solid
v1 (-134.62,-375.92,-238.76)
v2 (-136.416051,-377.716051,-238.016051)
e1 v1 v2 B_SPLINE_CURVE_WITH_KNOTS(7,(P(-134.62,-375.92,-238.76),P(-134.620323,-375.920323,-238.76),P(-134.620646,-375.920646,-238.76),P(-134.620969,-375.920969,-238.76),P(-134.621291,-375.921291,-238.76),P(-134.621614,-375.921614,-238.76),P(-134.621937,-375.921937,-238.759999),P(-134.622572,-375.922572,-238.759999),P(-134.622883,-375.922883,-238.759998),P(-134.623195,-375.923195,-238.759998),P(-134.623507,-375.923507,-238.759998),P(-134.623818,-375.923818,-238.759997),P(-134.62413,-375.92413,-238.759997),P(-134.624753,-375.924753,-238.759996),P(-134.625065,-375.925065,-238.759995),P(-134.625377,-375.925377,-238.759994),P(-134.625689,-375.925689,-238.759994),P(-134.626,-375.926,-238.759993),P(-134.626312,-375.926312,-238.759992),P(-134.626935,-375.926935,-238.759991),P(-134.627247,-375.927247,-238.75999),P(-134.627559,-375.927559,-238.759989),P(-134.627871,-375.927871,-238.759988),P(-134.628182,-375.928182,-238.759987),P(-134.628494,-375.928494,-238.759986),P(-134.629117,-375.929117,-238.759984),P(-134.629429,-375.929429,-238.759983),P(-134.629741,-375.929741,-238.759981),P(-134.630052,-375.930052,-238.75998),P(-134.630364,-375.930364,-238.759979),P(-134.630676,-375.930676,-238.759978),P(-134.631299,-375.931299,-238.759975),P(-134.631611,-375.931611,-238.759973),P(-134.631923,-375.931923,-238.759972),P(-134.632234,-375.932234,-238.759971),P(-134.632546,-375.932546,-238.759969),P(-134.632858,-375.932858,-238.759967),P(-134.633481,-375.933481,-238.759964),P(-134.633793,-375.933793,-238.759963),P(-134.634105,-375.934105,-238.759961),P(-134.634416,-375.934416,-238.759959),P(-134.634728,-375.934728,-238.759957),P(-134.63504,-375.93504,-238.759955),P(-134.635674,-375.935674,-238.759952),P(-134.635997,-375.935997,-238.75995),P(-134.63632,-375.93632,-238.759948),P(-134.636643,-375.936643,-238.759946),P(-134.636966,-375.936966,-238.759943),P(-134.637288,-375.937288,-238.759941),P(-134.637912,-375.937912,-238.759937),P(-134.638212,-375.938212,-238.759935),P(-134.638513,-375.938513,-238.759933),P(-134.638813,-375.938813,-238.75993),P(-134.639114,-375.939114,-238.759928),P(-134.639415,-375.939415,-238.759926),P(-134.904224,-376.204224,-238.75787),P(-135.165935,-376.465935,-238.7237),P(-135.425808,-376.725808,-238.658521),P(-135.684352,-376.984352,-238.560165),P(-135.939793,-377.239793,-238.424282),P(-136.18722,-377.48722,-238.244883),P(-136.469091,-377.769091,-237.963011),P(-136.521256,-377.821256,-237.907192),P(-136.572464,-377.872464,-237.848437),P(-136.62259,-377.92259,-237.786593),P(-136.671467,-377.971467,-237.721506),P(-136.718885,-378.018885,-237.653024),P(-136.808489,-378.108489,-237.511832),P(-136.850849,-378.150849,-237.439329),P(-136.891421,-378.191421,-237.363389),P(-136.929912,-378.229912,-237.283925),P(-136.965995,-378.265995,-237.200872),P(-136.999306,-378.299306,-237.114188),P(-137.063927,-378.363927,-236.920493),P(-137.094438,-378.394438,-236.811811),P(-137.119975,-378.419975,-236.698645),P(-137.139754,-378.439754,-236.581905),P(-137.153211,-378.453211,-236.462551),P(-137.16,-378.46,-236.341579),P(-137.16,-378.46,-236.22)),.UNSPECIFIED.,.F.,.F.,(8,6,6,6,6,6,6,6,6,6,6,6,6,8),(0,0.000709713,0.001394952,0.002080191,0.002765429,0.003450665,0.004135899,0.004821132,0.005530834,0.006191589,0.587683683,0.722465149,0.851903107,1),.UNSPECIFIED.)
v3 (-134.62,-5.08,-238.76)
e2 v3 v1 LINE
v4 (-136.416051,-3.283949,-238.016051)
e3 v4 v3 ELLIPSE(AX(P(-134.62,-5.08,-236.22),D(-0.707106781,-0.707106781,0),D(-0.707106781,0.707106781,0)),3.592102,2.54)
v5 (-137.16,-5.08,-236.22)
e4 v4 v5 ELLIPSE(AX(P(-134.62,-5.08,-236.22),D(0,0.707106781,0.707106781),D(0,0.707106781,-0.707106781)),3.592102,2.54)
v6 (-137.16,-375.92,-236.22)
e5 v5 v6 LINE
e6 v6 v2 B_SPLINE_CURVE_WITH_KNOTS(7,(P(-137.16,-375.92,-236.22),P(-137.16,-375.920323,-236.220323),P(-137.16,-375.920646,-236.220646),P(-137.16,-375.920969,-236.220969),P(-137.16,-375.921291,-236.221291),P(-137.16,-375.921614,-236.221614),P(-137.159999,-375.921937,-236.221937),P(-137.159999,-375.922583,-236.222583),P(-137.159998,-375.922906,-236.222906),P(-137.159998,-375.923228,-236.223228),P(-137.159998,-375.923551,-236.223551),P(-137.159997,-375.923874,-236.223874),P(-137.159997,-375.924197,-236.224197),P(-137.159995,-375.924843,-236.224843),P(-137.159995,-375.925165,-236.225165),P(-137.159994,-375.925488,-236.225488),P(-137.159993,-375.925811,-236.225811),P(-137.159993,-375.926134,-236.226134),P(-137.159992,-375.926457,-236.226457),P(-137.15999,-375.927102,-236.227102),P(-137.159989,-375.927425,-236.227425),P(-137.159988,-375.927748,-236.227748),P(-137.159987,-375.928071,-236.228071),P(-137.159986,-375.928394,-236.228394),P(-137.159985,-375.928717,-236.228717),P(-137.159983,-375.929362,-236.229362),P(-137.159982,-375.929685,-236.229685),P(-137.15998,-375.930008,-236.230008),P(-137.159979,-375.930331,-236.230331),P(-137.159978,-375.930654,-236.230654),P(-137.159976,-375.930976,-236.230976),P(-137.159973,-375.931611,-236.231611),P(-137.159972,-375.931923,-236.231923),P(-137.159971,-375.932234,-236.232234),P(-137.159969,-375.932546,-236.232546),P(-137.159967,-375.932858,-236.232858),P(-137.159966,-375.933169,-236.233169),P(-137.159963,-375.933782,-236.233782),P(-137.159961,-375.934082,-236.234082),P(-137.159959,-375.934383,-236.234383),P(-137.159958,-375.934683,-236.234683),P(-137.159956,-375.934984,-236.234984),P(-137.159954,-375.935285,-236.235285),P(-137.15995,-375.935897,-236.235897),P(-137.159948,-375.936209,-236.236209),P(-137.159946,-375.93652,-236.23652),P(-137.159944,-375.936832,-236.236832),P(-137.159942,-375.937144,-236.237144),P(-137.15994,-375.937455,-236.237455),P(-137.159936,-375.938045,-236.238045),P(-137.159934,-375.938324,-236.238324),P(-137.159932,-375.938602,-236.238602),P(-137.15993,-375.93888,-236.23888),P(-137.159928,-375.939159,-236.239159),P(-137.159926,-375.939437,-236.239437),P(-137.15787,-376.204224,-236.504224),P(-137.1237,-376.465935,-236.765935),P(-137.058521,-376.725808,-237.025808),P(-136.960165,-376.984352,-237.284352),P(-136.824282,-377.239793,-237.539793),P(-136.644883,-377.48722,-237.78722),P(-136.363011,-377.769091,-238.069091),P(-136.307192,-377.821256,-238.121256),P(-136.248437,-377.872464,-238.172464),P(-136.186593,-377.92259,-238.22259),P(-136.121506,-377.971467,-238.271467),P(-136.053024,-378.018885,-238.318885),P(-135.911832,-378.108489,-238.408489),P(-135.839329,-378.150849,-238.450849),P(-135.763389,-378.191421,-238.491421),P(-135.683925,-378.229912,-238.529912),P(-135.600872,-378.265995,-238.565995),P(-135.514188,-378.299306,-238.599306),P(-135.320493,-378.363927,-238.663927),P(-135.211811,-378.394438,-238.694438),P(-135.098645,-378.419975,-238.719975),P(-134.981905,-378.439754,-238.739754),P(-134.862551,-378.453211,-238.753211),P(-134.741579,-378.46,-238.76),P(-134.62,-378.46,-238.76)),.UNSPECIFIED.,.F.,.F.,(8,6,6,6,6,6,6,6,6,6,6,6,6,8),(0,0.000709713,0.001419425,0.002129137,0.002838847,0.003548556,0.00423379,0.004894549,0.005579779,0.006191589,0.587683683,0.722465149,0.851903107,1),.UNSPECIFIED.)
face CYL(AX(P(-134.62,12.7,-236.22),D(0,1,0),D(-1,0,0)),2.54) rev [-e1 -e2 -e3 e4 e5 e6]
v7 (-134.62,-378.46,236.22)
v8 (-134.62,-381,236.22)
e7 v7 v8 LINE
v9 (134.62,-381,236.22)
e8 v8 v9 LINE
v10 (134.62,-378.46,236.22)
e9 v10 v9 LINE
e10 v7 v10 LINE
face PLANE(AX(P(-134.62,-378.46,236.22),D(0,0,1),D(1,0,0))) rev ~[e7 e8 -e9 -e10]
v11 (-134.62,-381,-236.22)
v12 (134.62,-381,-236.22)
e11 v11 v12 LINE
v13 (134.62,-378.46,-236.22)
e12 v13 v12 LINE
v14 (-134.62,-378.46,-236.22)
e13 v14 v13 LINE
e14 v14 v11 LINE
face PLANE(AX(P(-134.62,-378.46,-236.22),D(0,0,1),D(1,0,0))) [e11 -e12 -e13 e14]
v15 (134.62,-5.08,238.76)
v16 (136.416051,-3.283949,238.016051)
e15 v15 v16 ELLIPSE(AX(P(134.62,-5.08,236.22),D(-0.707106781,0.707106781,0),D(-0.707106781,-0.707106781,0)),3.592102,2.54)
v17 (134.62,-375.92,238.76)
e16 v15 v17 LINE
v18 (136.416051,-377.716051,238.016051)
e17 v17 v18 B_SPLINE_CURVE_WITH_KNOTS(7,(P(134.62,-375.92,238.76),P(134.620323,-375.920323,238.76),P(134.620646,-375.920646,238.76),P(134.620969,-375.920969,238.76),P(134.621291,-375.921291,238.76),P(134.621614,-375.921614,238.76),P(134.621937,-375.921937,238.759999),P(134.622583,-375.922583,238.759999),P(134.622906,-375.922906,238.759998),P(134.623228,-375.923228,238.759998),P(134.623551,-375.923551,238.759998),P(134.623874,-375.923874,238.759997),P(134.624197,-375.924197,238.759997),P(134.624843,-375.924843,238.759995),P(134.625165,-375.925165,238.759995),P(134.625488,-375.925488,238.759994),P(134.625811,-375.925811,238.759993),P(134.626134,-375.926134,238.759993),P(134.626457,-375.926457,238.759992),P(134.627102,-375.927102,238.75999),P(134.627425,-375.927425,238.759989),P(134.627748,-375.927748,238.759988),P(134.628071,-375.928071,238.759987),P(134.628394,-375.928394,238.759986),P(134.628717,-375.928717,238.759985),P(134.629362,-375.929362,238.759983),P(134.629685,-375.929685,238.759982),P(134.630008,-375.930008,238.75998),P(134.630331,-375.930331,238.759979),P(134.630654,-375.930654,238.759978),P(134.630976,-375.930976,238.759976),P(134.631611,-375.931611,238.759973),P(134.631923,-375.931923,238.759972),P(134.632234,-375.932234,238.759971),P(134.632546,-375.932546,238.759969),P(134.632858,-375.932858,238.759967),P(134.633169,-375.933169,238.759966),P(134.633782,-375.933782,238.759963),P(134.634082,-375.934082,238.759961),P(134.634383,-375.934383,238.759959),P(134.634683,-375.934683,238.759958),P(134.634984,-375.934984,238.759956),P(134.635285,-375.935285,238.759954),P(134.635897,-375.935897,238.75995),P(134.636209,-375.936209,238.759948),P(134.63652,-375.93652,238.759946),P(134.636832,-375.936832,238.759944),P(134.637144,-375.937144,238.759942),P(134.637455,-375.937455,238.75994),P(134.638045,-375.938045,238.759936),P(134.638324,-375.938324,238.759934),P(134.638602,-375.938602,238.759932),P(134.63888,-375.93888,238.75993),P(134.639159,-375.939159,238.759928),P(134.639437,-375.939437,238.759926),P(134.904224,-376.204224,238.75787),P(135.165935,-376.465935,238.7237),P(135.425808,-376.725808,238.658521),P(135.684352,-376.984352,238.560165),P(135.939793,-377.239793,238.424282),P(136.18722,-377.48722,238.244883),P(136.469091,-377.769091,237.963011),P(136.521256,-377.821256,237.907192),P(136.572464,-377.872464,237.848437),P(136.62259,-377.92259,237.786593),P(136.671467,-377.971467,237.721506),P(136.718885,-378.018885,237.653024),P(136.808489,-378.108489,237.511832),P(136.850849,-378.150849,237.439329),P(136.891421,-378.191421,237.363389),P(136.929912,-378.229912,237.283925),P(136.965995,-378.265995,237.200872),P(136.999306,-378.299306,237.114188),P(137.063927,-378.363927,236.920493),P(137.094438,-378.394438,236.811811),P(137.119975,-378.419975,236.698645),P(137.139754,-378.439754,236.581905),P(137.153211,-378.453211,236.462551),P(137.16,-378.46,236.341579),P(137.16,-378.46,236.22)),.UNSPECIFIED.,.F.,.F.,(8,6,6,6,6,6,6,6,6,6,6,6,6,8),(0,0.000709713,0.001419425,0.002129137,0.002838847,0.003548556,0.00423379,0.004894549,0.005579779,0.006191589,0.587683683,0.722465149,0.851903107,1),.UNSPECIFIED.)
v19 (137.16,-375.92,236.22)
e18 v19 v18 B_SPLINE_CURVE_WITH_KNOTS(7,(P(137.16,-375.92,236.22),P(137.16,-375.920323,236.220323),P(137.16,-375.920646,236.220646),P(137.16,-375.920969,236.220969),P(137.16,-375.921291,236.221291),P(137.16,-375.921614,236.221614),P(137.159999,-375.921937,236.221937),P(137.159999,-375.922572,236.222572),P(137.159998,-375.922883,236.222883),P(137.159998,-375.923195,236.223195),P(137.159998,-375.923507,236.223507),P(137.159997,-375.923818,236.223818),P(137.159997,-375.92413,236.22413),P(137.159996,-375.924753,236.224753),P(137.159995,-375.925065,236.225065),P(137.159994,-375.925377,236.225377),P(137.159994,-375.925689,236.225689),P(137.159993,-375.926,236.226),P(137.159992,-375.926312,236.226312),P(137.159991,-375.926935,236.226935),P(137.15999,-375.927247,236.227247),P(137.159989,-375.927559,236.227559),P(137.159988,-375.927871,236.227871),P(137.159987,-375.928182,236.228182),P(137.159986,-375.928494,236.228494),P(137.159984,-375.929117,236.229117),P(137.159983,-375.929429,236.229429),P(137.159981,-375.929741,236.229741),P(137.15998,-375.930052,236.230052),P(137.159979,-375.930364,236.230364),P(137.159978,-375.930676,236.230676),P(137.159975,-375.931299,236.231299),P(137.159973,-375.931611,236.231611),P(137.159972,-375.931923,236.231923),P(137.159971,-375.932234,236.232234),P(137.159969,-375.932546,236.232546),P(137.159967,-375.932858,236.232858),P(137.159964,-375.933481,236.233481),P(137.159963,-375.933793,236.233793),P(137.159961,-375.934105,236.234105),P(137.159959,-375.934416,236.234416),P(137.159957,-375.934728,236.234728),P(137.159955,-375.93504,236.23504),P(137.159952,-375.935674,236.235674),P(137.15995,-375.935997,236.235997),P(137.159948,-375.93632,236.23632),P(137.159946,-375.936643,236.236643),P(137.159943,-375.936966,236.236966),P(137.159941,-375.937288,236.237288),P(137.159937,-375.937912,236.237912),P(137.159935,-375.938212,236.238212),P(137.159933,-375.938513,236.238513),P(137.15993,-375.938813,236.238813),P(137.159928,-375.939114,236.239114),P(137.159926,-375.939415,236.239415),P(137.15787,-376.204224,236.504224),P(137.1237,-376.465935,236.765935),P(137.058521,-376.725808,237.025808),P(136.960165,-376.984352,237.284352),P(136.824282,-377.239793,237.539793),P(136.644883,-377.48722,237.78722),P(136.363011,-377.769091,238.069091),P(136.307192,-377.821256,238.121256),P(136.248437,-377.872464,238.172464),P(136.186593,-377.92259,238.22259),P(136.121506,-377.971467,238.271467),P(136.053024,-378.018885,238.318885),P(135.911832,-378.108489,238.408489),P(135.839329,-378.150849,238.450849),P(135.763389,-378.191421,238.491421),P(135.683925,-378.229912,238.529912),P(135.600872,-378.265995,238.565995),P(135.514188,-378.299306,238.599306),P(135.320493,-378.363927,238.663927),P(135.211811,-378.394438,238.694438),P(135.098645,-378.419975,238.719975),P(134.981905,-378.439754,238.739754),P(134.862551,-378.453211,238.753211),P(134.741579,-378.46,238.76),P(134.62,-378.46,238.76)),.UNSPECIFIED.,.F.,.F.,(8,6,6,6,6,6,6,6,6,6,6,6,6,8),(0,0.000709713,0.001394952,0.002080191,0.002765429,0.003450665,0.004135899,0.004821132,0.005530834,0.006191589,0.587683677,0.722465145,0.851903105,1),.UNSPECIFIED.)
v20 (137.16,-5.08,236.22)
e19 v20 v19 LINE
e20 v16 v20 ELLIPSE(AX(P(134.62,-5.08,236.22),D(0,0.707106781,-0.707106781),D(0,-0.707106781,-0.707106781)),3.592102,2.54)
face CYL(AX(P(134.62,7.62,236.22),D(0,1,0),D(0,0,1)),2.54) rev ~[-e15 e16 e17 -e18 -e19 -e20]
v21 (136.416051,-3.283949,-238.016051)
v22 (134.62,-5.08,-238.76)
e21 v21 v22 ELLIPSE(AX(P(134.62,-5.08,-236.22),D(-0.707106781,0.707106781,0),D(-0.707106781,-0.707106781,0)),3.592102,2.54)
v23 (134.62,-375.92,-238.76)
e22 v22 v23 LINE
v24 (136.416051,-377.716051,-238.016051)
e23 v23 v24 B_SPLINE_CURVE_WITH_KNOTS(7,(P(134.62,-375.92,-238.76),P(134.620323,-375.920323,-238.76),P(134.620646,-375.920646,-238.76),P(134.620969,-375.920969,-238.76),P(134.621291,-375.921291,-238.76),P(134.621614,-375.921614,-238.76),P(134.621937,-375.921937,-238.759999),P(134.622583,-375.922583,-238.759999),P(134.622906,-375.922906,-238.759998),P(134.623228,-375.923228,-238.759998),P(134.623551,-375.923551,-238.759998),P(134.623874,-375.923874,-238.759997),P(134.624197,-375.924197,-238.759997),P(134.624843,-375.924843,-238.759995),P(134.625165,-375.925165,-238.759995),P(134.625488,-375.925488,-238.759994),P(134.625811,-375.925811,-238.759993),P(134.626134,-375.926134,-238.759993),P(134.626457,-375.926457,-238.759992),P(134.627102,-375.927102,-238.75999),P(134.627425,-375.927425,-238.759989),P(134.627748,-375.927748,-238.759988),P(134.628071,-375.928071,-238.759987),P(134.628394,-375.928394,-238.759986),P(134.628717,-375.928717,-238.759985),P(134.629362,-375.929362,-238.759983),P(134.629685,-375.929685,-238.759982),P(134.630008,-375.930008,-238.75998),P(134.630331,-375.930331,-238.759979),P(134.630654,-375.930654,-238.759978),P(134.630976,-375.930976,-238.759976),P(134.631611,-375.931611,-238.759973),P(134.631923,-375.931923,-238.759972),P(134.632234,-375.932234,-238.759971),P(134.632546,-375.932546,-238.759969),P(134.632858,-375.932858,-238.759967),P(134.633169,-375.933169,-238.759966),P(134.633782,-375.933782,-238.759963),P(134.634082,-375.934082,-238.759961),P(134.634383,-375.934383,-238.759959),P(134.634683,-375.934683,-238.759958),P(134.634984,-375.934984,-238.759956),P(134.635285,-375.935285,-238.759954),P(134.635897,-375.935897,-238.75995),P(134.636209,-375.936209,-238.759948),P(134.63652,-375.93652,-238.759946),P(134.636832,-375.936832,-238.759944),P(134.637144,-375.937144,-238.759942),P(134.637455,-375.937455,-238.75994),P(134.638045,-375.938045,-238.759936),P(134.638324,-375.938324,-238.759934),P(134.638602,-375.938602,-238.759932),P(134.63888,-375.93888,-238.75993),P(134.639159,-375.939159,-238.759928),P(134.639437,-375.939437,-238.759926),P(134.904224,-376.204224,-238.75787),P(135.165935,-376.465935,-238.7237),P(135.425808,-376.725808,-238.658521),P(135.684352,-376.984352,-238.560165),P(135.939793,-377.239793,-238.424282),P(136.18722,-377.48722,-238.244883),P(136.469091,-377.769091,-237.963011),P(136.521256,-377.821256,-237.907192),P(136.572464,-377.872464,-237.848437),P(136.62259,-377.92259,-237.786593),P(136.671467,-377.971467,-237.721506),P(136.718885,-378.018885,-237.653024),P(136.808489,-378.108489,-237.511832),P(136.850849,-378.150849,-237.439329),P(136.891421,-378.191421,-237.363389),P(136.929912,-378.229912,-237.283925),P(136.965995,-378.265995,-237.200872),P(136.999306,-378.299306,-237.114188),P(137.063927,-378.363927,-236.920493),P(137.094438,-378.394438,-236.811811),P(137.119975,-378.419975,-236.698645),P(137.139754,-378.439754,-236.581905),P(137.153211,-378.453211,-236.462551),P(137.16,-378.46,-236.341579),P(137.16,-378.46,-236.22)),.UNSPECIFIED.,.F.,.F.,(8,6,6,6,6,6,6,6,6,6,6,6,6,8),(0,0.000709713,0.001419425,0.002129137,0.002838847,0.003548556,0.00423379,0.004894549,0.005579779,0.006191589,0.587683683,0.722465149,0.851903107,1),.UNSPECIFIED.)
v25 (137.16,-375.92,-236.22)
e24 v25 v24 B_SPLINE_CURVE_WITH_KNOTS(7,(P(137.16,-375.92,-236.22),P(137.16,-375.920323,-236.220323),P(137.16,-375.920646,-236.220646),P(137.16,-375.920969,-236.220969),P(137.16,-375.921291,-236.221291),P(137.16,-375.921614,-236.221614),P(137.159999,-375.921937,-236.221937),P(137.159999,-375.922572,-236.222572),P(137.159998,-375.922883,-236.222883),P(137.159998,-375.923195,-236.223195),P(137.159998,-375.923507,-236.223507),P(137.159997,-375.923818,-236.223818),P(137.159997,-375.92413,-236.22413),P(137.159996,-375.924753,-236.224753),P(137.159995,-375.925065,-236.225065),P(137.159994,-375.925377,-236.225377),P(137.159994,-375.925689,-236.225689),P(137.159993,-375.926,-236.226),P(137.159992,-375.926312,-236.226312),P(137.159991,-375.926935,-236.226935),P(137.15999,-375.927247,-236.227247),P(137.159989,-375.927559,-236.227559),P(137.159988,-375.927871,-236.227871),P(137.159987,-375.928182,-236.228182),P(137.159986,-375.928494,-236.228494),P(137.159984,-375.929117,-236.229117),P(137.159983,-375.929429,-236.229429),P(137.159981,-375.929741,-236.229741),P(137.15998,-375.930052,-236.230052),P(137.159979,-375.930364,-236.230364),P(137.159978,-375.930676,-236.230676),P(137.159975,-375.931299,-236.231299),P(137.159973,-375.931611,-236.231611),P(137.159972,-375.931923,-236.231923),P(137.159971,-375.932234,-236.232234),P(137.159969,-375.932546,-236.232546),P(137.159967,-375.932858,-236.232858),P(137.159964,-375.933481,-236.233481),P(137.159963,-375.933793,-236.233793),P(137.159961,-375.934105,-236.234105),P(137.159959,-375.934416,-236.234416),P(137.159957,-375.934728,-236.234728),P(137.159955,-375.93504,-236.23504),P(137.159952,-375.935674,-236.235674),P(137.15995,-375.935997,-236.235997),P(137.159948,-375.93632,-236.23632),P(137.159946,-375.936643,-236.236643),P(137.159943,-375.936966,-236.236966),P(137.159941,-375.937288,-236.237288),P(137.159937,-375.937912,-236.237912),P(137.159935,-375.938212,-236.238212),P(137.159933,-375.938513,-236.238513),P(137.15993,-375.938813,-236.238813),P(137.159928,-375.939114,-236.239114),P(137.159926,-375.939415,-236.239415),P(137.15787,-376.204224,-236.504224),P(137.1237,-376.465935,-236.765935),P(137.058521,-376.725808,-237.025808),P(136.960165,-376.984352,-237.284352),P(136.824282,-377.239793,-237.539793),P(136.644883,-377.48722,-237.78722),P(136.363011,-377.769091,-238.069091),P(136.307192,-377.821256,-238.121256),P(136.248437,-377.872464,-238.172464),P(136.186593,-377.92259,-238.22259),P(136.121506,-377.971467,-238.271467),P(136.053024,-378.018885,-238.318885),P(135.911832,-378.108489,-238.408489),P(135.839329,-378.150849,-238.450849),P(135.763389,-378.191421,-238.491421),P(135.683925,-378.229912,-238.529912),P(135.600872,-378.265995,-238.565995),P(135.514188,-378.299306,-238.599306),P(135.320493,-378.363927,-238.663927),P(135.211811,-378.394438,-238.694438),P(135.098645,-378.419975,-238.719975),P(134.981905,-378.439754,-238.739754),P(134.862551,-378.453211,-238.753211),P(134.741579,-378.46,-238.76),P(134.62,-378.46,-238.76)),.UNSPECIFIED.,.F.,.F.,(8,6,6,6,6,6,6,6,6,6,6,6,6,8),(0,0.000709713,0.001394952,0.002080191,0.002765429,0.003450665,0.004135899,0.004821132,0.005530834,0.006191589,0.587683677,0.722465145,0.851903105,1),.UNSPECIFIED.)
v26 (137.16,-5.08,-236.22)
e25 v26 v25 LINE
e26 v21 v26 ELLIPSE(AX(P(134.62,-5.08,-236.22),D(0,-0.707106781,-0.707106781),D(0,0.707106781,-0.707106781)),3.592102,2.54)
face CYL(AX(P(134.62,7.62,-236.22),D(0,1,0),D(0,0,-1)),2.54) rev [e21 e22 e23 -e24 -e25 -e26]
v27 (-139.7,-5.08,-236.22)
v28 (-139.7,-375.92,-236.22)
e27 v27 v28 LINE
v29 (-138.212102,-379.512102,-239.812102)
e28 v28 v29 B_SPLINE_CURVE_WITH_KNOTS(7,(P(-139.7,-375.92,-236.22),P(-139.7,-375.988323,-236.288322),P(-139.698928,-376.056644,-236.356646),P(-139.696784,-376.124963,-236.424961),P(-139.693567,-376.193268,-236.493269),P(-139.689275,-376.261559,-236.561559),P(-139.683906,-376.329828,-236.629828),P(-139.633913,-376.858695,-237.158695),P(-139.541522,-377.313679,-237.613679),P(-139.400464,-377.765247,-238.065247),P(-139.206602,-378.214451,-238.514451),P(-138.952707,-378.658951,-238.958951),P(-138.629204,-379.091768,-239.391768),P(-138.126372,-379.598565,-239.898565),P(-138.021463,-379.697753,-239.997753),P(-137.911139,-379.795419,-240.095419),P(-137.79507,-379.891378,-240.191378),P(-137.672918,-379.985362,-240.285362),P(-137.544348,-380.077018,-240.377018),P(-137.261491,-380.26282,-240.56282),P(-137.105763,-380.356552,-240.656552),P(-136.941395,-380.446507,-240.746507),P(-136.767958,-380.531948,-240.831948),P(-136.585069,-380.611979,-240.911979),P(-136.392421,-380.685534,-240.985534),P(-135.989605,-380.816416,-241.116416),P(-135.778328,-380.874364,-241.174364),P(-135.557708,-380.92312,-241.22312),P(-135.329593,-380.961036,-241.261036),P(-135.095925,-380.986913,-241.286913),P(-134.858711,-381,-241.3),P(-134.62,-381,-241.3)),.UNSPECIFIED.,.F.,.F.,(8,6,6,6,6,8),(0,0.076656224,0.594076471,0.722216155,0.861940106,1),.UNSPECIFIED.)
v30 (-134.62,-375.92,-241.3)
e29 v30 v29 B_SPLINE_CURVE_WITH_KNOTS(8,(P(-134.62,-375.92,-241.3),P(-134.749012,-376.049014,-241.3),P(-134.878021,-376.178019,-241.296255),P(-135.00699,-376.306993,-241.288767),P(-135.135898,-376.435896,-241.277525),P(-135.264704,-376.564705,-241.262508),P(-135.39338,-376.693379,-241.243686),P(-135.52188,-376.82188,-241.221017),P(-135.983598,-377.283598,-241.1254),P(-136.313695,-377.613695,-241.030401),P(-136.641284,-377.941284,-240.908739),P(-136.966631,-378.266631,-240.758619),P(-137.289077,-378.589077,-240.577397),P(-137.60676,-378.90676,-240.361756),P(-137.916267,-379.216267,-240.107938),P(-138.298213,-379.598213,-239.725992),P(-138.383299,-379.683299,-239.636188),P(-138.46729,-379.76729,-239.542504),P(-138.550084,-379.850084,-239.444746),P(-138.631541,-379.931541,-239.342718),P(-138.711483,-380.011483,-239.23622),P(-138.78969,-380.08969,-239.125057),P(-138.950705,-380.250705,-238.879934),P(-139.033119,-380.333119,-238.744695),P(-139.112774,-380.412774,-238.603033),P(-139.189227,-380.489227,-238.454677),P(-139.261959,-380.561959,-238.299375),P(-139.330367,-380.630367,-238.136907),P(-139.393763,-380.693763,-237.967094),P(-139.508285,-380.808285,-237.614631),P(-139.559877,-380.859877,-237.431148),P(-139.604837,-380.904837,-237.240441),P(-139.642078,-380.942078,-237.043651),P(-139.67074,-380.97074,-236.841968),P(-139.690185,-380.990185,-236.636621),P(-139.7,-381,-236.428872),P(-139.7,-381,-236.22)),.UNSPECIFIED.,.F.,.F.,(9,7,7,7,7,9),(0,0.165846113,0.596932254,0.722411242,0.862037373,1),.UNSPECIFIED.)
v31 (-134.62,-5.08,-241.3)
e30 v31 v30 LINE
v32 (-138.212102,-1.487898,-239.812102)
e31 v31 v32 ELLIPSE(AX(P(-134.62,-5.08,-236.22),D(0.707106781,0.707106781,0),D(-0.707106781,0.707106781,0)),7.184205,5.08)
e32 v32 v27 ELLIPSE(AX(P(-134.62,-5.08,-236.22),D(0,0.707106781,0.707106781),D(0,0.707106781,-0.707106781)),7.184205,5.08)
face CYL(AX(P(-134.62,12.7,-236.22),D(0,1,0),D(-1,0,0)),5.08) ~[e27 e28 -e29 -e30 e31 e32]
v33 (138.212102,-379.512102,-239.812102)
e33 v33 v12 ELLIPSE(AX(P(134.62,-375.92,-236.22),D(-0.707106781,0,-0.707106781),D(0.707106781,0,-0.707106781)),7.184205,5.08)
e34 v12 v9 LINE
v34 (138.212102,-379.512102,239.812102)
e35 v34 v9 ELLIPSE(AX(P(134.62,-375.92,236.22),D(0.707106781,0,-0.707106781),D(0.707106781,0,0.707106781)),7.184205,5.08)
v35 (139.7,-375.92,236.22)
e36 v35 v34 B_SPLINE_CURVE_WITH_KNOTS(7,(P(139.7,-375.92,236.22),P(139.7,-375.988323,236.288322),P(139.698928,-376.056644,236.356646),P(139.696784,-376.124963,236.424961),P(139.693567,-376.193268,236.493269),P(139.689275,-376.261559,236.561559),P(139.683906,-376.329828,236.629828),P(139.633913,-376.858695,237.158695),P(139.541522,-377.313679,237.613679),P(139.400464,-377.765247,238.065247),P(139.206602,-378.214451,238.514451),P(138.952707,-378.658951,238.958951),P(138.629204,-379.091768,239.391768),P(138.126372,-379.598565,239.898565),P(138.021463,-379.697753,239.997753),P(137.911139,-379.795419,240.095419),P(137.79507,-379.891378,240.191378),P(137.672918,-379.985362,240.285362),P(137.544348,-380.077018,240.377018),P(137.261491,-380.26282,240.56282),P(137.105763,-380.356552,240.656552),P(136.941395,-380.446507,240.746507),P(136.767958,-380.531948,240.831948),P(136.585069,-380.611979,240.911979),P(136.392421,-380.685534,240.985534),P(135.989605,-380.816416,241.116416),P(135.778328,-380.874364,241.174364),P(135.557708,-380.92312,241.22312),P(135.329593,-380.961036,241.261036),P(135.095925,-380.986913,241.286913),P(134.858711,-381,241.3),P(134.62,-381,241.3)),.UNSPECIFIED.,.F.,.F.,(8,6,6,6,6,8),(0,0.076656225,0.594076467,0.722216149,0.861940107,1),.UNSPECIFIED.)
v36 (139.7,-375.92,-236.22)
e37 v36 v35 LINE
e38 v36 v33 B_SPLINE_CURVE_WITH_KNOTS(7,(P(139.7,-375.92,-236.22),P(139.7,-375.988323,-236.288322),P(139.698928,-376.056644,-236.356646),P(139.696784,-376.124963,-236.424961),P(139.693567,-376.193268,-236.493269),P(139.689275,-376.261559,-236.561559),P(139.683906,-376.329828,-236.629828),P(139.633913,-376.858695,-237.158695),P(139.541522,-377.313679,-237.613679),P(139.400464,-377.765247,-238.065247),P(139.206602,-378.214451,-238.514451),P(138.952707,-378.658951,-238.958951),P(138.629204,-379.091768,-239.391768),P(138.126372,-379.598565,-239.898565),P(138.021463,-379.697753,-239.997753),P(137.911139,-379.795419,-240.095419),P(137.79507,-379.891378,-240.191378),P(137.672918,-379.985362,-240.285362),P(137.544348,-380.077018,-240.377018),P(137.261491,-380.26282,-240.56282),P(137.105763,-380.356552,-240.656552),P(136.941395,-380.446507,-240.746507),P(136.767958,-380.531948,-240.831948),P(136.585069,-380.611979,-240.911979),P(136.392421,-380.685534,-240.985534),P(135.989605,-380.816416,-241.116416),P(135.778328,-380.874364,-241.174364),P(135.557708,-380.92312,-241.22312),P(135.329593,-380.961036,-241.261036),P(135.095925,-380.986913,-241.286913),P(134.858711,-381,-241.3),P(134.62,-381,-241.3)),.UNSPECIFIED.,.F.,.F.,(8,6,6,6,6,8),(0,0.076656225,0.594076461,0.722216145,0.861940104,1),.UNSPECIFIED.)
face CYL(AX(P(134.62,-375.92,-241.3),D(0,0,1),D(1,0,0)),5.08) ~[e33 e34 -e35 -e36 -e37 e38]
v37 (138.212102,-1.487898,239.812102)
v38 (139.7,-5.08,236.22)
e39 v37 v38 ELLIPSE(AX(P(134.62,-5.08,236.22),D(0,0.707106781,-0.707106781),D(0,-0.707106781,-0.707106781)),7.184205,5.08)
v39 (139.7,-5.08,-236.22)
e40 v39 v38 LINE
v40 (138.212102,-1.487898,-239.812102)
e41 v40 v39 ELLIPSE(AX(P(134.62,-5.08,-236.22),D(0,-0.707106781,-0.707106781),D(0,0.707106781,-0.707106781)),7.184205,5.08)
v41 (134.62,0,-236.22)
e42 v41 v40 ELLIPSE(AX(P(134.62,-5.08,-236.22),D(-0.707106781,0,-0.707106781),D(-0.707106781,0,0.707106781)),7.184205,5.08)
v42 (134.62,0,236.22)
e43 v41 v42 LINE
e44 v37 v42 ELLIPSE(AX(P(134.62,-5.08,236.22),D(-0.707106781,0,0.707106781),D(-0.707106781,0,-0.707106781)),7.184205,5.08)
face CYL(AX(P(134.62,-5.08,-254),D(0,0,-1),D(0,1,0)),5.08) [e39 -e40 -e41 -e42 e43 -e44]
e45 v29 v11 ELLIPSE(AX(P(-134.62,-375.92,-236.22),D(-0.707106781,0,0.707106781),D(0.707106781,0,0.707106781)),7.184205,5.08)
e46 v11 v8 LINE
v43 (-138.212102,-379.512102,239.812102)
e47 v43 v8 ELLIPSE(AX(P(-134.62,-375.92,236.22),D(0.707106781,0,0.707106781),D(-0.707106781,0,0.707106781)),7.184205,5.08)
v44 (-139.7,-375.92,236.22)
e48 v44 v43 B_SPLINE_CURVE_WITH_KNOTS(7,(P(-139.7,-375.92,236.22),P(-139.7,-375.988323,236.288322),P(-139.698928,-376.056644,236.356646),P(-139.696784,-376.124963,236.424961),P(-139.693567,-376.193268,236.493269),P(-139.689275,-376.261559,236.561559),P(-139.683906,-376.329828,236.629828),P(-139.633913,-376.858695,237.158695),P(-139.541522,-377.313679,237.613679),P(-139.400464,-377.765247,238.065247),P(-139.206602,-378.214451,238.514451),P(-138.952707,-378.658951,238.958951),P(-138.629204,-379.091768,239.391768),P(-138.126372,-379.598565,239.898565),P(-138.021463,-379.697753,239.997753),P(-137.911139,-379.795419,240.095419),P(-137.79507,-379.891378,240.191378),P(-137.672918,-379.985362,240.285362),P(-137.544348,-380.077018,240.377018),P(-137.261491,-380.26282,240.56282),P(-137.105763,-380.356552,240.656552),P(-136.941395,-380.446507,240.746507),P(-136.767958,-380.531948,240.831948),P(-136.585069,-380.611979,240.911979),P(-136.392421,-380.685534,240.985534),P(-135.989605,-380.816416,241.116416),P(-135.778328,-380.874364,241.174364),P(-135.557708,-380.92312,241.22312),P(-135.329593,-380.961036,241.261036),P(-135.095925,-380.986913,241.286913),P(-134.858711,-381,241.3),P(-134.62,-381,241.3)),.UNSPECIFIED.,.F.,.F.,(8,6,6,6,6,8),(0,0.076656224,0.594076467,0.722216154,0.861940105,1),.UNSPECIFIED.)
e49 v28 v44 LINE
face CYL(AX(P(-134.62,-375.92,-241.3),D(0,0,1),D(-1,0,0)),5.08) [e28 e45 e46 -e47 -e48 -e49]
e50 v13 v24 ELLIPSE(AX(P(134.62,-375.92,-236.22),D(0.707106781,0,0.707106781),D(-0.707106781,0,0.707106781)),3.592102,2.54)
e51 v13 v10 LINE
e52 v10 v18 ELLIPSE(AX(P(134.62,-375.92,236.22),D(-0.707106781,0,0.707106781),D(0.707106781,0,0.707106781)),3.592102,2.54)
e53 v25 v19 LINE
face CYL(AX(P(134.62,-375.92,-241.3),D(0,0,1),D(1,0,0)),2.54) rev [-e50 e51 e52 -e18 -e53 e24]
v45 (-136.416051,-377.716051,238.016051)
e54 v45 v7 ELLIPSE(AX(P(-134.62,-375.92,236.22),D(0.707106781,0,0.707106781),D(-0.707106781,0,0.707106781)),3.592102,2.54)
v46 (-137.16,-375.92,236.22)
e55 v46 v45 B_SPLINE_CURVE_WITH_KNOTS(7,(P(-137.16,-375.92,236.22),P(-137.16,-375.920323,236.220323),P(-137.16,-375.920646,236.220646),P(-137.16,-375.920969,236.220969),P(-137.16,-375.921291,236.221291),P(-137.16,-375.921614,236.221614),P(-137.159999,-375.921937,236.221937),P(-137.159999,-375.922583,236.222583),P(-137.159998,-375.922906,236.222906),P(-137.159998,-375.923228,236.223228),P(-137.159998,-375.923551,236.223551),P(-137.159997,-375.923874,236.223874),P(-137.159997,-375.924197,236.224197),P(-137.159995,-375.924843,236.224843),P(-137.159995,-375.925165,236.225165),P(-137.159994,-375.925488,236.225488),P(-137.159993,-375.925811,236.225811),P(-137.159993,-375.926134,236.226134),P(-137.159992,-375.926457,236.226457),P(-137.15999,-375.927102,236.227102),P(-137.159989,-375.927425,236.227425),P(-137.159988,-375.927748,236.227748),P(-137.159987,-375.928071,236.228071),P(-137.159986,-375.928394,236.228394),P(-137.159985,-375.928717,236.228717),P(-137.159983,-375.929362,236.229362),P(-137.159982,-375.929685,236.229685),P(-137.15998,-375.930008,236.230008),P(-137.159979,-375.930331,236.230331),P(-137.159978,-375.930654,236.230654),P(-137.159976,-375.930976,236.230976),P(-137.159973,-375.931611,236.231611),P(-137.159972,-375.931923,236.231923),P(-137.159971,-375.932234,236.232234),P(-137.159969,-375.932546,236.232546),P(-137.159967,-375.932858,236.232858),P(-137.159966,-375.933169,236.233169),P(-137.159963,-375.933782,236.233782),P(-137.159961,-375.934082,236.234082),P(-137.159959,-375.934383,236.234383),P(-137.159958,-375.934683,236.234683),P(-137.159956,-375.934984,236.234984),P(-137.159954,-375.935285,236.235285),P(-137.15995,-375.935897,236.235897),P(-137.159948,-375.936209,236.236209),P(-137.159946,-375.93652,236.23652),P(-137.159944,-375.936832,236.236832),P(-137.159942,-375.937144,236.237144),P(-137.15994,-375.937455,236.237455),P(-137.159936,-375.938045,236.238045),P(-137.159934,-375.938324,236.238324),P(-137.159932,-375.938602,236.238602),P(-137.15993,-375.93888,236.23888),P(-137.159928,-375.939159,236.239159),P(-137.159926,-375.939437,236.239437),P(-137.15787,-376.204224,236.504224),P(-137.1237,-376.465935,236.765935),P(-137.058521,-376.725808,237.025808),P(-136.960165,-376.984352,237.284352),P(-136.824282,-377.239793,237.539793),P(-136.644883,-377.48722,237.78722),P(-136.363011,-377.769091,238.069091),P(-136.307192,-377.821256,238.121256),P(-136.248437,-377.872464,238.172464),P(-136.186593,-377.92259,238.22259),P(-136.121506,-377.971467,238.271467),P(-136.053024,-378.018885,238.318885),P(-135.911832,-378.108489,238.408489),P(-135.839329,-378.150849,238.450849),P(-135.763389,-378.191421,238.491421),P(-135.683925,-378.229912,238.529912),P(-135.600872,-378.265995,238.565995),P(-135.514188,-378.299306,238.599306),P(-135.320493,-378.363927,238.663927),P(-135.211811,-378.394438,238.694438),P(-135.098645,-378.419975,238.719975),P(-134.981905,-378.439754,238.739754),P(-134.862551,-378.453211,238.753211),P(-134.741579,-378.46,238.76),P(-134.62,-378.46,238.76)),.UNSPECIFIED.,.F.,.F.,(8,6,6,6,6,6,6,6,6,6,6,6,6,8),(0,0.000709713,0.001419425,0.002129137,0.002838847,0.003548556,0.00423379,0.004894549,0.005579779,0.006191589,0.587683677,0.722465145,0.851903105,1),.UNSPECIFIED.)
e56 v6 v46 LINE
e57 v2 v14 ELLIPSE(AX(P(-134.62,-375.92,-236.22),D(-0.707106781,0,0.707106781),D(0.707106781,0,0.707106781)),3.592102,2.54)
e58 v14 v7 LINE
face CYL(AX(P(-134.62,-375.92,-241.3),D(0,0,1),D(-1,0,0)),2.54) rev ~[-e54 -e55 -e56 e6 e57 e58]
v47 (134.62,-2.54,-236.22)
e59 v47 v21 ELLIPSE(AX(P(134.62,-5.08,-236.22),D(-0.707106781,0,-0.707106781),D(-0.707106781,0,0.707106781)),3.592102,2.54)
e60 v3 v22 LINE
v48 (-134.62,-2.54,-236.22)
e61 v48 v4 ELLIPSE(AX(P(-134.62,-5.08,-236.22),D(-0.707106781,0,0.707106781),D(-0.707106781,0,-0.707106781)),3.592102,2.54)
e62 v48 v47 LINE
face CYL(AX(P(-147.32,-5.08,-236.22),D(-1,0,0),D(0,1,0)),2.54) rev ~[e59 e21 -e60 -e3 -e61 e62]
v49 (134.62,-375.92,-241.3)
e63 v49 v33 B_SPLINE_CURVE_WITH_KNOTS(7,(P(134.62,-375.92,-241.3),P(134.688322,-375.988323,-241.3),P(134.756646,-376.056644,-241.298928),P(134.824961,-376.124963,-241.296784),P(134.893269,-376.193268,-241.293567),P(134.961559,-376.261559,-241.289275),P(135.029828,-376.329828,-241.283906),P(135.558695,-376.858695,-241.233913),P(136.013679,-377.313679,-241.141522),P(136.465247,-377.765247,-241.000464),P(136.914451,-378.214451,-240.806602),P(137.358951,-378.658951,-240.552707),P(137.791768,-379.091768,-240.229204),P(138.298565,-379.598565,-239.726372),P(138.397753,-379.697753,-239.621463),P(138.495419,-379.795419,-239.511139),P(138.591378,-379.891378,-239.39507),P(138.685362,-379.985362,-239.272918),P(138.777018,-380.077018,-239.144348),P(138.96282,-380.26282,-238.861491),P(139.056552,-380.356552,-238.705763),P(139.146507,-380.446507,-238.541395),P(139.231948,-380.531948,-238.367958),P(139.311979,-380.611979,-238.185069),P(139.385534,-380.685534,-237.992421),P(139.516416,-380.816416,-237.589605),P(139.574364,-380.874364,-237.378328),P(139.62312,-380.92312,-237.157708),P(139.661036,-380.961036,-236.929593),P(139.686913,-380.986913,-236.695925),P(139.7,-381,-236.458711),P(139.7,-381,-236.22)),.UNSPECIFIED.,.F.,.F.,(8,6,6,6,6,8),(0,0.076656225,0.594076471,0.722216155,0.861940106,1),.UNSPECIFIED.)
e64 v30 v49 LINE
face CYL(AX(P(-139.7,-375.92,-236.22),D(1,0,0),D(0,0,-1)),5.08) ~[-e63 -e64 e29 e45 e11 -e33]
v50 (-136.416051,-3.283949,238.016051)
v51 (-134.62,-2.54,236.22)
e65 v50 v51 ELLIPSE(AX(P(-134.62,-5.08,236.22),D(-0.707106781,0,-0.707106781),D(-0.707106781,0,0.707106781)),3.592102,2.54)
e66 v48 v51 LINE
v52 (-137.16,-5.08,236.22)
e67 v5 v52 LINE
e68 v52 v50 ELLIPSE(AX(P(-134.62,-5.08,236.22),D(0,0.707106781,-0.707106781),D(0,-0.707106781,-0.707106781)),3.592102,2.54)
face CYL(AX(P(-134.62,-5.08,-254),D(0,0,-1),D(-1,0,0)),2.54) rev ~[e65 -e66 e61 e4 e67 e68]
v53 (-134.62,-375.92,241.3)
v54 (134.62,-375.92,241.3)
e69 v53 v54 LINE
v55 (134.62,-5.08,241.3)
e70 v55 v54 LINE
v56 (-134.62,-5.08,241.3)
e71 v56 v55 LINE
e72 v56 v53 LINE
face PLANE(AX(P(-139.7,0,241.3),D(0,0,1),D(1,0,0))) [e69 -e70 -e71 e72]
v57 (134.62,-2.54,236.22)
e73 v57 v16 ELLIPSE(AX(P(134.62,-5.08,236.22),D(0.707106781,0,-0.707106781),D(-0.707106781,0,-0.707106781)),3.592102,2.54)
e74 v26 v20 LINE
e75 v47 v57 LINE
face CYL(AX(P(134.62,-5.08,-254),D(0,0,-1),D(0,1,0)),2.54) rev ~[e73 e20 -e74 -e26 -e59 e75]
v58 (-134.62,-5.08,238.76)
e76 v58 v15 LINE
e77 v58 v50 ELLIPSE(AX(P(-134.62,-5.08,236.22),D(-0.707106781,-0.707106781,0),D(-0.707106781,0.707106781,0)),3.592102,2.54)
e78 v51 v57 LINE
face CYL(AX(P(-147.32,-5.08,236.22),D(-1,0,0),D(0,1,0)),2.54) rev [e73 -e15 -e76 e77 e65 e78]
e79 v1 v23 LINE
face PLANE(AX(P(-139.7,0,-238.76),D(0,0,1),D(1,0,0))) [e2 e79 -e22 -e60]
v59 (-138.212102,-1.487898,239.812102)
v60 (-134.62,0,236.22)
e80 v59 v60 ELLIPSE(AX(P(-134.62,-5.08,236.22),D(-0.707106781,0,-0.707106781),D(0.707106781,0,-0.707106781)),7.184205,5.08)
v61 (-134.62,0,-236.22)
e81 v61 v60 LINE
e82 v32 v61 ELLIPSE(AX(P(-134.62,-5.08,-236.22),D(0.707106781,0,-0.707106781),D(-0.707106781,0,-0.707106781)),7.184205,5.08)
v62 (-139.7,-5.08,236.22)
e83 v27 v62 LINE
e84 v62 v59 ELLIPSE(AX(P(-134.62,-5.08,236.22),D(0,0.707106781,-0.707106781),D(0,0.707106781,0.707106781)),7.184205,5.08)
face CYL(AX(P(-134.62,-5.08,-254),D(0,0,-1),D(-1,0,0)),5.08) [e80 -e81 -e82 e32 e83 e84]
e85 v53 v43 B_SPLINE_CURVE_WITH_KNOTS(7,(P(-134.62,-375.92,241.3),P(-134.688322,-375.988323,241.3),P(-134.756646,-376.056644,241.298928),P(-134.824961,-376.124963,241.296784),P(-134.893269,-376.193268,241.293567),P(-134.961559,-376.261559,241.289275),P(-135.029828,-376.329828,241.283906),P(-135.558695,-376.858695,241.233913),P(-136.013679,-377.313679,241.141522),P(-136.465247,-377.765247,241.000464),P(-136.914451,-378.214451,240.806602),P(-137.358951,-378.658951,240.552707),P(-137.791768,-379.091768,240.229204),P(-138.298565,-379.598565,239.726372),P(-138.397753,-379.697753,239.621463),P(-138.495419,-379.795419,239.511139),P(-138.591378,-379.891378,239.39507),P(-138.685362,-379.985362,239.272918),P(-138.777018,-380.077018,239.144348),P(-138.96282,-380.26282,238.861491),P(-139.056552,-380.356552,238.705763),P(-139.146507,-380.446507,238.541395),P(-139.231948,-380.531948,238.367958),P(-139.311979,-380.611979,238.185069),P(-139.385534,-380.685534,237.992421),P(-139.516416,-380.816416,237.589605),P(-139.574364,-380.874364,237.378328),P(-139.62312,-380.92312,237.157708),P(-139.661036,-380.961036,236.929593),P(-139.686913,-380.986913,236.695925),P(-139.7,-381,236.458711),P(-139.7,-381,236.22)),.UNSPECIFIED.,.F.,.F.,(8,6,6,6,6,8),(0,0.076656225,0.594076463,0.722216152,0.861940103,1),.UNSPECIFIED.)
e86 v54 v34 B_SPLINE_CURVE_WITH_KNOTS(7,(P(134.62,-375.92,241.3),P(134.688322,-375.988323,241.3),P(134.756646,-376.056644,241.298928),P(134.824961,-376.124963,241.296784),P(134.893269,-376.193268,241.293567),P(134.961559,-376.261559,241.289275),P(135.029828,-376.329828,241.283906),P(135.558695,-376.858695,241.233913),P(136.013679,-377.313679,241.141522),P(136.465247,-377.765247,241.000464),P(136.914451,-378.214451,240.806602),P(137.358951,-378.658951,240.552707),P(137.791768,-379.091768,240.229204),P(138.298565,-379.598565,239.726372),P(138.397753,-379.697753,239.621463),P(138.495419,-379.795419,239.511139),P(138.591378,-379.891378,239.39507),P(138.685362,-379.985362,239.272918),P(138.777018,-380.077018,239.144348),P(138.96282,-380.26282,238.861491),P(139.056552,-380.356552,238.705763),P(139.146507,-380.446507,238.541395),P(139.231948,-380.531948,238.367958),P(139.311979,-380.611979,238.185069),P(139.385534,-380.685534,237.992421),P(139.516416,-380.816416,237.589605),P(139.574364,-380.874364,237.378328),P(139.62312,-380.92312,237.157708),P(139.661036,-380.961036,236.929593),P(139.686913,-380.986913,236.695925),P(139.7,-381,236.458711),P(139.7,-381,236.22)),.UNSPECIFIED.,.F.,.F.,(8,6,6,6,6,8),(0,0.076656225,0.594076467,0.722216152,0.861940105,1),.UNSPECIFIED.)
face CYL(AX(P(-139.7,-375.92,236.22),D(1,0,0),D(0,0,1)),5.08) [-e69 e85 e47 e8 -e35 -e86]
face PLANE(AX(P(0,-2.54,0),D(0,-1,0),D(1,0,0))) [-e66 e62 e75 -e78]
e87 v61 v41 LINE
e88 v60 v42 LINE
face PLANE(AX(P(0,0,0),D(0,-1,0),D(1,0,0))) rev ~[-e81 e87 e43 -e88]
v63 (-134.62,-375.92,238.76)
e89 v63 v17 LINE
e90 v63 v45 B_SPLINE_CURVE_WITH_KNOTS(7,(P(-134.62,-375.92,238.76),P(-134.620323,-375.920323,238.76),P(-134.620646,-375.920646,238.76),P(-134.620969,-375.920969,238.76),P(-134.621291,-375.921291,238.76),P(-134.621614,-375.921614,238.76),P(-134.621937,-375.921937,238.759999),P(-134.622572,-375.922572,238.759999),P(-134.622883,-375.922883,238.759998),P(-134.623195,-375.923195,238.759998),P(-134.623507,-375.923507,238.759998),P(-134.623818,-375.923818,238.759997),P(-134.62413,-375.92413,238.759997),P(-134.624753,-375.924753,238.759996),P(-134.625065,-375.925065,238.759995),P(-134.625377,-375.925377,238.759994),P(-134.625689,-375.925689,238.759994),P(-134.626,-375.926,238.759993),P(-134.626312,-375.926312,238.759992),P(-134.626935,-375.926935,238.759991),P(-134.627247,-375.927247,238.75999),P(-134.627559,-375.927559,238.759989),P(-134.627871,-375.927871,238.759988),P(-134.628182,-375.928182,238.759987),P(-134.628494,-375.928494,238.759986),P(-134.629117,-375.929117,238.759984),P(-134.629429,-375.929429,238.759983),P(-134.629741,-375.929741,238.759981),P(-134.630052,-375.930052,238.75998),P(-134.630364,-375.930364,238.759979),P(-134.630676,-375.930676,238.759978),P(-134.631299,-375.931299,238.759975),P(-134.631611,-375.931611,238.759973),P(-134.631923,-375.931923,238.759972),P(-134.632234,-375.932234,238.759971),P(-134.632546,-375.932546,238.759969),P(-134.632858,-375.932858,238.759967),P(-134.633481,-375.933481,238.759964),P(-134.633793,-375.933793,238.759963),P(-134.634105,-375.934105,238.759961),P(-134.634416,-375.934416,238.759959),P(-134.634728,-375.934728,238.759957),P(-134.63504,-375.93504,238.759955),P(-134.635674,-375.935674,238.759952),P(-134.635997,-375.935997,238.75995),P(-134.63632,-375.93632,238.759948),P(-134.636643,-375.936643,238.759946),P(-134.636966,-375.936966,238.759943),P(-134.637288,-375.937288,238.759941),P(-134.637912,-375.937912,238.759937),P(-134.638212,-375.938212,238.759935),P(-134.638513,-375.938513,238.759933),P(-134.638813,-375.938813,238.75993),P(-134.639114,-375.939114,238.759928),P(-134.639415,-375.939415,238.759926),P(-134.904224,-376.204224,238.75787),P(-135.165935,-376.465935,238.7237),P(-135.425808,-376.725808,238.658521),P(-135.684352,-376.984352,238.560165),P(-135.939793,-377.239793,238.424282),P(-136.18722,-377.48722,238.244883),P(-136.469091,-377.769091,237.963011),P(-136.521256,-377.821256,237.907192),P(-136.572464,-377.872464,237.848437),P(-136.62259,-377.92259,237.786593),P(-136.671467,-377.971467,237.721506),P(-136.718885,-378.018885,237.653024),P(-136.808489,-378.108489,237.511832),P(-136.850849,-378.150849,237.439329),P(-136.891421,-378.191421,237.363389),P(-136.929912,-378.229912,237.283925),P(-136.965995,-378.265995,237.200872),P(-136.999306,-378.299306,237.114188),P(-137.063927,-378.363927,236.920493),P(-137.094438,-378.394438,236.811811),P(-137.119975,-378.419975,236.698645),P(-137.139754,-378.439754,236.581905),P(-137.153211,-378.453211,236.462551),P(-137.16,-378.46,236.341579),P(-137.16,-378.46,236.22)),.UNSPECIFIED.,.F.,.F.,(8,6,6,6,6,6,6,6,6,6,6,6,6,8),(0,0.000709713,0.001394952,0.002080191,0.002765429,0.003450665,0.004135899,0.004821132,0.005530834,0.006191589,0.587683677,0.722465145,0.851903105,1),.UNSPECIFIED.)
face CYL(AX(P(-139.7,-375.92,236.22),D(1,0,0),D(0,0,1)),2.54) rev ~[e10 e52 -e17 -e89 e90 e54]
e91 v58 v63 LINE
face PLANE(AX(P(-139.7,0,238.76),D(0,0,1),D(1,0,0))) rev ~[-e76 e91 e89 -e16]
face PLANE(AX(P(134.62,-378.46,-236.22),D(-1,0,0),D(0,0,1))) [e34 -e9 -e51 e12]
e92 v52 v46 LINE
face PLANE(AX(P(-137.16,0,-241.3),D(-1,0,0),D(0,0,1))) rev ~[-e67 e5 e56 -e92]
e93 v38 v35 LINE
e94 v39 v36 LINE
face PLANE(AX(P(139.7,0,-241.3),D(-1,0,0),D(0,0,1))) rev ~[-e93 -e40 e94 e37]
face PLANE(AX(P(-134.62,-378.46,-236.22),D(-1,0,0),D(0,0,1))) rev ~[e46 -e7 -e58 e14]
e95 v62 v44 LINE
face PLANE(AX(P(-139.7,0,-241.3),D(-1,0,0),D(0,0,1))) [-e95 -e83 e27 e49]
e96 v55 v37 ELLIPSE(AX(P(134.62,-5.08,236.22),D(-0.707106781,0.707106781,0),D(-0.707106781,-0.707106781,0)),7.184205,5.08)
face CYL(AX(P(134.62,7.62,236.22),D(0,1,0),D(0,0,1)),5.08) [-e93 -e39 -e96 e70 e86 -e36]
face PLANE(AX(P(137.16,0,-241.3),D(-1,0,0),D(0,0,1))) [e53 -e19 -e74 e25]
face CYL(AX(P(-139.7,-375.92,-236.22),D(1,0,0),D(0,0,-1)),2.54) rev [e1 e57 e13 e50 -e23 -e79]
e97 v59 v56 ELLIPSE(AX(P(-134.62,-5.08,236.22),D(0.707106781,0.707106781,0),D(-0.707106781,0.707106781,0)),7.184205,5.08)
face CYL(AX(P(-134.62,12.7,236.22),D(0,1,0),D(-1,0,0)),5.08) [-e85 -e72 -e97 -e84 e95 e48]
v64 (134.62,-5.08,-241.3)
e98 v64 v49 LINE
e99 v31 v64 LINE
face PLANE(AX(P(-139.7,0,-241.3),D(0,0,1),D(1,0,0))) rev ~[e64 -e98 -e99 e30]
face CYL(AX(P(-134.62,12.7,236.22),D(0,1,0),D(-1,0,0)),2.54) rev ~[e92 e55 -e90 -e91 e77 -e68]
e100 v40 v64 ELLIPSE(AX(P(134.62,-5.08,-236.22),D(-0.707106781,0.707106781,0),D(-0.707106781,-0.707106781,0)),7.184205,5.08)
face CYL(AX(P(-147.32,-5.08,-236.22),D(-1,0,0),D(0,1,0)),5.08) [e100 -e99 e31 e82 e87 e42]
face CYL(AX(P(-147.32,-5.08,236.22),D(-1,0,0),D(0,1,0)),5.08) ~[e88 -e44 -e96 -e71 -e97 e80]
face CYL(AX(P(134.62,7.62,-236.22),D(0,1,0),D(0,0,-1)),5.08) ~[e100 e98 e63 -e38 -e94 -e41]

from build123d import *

# Parameters (mm, degrees)
F0_W        = 279.4
F0_H        = 482.6
F1_DEPTH    = 381
F2_R        = 5.08
F3_T1_DEPTH = 401.32
F3_T3_DEPTH = 508
F4_T1_DEPTH = 299.72
F4_T3_DEPTH = 508
F5_T1_DEPTH = 396.24
F6_T        = -2.54


# Not quite as in the source:
# - a fillet or chamfer that OpenCascade refuses, or shapes differently, is made with other operations: its cross-section is extruded or revolved along the edge and cut away or added
# - a shell that OpenCascade refuses in one call is made with other operations: the cavity is built on its own and cut out


with BuildPart() as f1:
    # F0 (on Front) → F1 (new body)
    with BuildSketch(Plane.XZ):
        Rectangle(F0_W, F0_H)
    extrude(amount=F1_DEPTH)

    # F2
    f2_edges = [f1.edges().sort_by_distance(p)[0] for p in [
        (-139.7, -381, 0),
        (0, -381, -241.3),
        (139.7, -381, 0),
        (0, -381, 241.3),
    ]]
    fillet(f2_edges, radius=F2_R)

    # F3: fillet of radius 5.08 on 4 edges, made by hand

    # F3_s2 → F3_t1 (cut)
    with BuildSketch(Plane.XZ.offset(-12.7)):
        with BuildLine():
            ThreePointArc((-139.7, 236.22), (-138.2121024484, 239.8121024484), (-134.62, 241.3))
            Line((-134.62, 241.3), (-139.7, 241.3))
            Line((-139.7, 241.3), (-139.7, 236.22))
        make_face()
        with BuildLine():
            ThreePointArc((-139.7, -236.22), (-138.2121024484, -239.8121024484), (-134.62, -241.3))
            Line((-134.62, -241.3), (-139.7, -241.3))
            Line((-139.7, -241.3), (-139.7, -236.22))
        make_face()
    extrude(amount=F3_T1_DEPTH, mode=Mode.SUBTRACT)

    # F3_s4 → F3_t3 (cut)
    with BuildSketch(Plane.XY.offset(-254)):
        with BuildLine():
            ThreePointArc((-139.7, -5.08), (-138.2121024484, -1.4878975516), (-134.62, 0))
            Line((-134.62, 0), (-139.7, 0))
            Line((-139.7, 0), (-139.7, -5.08))
        make_face()
    extrude(amount=F3_T3_DEPTH, mode=Mode.SUBTRACT)

    # F4: fillet of radius 5.08 on 4 edges, made by hand

    # F4_s2 → F4_t1 (cut)
    with BuildSketch(Plane.YZ.offset(-147.32)):
        with BuildLine():
            ThreePointArc((0, 236.22), (-1.4878975516, 239.8121024484), (-5.08, 241.3))
            Line((-5.08, 241.3), (0, 241.3))
            Line((0, 241.3), (0, 236.22))
        make_face()
        with BuildLine():
            ThreePointArc((0, -236.22), (-1.4878975516, -239.8121024484), (-5.08, -241.3))
            Line((-5.08, -241.3), (0, -241.3))
            Line((0, -241.3), (0, -236.22))
        make_face()
    extrude(amount=F4_T1_DEPTH, mode=Mode.SUBTRACT)

    # F4_s4 → F4_t3 (cut)
    with BuildSketch(Plane.XY.offset(-254)):
        with BuildLine():
            ThreePointArc((134.62, 0), (138.2121024484, -1.4878975516), (139.7, -5.08))
            Line((139.7, -5.08), (139.7, 0))
            Line((139.7, 0), (134.62, 0))
        make_face()
    extrude(amount=F4_T3_DEPTH, mode=Mode.SUBTRACT)

    # F5: fillet of radius 5.08 on 4 edges, made by hand

    # F5_s2 → F5_t1 (cut)
    with BuildSketch(Plane.XZ.offset(-7.62)):
        with BuildLine():
            ThreePointArc((134.62, 241.3), (138.2121024484, 239.8121024484), (139.7, 236.22))
            Line((139.7, 236.22), (139.7, 241.3))
            Line((139.7, 241.3), (134.62, 241.3))
        make_face()
        with BuildLine():
            ThreePointArc((134.62, -241.3), (138.2121024484, -239.8121024484), (139.7, -236.22))
            Line((139.7, -236.22), (139.7, -241.3))
            Line((139.7, -241.3), (134.62, -241.3))
        make_face()
    extrude(amount=F5_T1_DEPTH, mode=Mode.SUBTRACT)

    # F6: a shell. OpenCascade refuses it in one call, so the cavity is built on its own and cut out:
    # the body offset inwards by the wall thickness, plus a prism from it out through each open face.
    f6_core = offset(f1.part, amount=F6_T, mode=Mode.PRIVATE)
    f6_exits = [f6_core.faces().sort_by_distance(p)[0] for p in [
        (0, -378.46, 0),
    ]]
    add(f6_core, mode=Mode.SUBTRACT)
    extrude(f6_exits, amount=-F6_T, mode=Mode.SUBTRACT)


solid = f1.part
